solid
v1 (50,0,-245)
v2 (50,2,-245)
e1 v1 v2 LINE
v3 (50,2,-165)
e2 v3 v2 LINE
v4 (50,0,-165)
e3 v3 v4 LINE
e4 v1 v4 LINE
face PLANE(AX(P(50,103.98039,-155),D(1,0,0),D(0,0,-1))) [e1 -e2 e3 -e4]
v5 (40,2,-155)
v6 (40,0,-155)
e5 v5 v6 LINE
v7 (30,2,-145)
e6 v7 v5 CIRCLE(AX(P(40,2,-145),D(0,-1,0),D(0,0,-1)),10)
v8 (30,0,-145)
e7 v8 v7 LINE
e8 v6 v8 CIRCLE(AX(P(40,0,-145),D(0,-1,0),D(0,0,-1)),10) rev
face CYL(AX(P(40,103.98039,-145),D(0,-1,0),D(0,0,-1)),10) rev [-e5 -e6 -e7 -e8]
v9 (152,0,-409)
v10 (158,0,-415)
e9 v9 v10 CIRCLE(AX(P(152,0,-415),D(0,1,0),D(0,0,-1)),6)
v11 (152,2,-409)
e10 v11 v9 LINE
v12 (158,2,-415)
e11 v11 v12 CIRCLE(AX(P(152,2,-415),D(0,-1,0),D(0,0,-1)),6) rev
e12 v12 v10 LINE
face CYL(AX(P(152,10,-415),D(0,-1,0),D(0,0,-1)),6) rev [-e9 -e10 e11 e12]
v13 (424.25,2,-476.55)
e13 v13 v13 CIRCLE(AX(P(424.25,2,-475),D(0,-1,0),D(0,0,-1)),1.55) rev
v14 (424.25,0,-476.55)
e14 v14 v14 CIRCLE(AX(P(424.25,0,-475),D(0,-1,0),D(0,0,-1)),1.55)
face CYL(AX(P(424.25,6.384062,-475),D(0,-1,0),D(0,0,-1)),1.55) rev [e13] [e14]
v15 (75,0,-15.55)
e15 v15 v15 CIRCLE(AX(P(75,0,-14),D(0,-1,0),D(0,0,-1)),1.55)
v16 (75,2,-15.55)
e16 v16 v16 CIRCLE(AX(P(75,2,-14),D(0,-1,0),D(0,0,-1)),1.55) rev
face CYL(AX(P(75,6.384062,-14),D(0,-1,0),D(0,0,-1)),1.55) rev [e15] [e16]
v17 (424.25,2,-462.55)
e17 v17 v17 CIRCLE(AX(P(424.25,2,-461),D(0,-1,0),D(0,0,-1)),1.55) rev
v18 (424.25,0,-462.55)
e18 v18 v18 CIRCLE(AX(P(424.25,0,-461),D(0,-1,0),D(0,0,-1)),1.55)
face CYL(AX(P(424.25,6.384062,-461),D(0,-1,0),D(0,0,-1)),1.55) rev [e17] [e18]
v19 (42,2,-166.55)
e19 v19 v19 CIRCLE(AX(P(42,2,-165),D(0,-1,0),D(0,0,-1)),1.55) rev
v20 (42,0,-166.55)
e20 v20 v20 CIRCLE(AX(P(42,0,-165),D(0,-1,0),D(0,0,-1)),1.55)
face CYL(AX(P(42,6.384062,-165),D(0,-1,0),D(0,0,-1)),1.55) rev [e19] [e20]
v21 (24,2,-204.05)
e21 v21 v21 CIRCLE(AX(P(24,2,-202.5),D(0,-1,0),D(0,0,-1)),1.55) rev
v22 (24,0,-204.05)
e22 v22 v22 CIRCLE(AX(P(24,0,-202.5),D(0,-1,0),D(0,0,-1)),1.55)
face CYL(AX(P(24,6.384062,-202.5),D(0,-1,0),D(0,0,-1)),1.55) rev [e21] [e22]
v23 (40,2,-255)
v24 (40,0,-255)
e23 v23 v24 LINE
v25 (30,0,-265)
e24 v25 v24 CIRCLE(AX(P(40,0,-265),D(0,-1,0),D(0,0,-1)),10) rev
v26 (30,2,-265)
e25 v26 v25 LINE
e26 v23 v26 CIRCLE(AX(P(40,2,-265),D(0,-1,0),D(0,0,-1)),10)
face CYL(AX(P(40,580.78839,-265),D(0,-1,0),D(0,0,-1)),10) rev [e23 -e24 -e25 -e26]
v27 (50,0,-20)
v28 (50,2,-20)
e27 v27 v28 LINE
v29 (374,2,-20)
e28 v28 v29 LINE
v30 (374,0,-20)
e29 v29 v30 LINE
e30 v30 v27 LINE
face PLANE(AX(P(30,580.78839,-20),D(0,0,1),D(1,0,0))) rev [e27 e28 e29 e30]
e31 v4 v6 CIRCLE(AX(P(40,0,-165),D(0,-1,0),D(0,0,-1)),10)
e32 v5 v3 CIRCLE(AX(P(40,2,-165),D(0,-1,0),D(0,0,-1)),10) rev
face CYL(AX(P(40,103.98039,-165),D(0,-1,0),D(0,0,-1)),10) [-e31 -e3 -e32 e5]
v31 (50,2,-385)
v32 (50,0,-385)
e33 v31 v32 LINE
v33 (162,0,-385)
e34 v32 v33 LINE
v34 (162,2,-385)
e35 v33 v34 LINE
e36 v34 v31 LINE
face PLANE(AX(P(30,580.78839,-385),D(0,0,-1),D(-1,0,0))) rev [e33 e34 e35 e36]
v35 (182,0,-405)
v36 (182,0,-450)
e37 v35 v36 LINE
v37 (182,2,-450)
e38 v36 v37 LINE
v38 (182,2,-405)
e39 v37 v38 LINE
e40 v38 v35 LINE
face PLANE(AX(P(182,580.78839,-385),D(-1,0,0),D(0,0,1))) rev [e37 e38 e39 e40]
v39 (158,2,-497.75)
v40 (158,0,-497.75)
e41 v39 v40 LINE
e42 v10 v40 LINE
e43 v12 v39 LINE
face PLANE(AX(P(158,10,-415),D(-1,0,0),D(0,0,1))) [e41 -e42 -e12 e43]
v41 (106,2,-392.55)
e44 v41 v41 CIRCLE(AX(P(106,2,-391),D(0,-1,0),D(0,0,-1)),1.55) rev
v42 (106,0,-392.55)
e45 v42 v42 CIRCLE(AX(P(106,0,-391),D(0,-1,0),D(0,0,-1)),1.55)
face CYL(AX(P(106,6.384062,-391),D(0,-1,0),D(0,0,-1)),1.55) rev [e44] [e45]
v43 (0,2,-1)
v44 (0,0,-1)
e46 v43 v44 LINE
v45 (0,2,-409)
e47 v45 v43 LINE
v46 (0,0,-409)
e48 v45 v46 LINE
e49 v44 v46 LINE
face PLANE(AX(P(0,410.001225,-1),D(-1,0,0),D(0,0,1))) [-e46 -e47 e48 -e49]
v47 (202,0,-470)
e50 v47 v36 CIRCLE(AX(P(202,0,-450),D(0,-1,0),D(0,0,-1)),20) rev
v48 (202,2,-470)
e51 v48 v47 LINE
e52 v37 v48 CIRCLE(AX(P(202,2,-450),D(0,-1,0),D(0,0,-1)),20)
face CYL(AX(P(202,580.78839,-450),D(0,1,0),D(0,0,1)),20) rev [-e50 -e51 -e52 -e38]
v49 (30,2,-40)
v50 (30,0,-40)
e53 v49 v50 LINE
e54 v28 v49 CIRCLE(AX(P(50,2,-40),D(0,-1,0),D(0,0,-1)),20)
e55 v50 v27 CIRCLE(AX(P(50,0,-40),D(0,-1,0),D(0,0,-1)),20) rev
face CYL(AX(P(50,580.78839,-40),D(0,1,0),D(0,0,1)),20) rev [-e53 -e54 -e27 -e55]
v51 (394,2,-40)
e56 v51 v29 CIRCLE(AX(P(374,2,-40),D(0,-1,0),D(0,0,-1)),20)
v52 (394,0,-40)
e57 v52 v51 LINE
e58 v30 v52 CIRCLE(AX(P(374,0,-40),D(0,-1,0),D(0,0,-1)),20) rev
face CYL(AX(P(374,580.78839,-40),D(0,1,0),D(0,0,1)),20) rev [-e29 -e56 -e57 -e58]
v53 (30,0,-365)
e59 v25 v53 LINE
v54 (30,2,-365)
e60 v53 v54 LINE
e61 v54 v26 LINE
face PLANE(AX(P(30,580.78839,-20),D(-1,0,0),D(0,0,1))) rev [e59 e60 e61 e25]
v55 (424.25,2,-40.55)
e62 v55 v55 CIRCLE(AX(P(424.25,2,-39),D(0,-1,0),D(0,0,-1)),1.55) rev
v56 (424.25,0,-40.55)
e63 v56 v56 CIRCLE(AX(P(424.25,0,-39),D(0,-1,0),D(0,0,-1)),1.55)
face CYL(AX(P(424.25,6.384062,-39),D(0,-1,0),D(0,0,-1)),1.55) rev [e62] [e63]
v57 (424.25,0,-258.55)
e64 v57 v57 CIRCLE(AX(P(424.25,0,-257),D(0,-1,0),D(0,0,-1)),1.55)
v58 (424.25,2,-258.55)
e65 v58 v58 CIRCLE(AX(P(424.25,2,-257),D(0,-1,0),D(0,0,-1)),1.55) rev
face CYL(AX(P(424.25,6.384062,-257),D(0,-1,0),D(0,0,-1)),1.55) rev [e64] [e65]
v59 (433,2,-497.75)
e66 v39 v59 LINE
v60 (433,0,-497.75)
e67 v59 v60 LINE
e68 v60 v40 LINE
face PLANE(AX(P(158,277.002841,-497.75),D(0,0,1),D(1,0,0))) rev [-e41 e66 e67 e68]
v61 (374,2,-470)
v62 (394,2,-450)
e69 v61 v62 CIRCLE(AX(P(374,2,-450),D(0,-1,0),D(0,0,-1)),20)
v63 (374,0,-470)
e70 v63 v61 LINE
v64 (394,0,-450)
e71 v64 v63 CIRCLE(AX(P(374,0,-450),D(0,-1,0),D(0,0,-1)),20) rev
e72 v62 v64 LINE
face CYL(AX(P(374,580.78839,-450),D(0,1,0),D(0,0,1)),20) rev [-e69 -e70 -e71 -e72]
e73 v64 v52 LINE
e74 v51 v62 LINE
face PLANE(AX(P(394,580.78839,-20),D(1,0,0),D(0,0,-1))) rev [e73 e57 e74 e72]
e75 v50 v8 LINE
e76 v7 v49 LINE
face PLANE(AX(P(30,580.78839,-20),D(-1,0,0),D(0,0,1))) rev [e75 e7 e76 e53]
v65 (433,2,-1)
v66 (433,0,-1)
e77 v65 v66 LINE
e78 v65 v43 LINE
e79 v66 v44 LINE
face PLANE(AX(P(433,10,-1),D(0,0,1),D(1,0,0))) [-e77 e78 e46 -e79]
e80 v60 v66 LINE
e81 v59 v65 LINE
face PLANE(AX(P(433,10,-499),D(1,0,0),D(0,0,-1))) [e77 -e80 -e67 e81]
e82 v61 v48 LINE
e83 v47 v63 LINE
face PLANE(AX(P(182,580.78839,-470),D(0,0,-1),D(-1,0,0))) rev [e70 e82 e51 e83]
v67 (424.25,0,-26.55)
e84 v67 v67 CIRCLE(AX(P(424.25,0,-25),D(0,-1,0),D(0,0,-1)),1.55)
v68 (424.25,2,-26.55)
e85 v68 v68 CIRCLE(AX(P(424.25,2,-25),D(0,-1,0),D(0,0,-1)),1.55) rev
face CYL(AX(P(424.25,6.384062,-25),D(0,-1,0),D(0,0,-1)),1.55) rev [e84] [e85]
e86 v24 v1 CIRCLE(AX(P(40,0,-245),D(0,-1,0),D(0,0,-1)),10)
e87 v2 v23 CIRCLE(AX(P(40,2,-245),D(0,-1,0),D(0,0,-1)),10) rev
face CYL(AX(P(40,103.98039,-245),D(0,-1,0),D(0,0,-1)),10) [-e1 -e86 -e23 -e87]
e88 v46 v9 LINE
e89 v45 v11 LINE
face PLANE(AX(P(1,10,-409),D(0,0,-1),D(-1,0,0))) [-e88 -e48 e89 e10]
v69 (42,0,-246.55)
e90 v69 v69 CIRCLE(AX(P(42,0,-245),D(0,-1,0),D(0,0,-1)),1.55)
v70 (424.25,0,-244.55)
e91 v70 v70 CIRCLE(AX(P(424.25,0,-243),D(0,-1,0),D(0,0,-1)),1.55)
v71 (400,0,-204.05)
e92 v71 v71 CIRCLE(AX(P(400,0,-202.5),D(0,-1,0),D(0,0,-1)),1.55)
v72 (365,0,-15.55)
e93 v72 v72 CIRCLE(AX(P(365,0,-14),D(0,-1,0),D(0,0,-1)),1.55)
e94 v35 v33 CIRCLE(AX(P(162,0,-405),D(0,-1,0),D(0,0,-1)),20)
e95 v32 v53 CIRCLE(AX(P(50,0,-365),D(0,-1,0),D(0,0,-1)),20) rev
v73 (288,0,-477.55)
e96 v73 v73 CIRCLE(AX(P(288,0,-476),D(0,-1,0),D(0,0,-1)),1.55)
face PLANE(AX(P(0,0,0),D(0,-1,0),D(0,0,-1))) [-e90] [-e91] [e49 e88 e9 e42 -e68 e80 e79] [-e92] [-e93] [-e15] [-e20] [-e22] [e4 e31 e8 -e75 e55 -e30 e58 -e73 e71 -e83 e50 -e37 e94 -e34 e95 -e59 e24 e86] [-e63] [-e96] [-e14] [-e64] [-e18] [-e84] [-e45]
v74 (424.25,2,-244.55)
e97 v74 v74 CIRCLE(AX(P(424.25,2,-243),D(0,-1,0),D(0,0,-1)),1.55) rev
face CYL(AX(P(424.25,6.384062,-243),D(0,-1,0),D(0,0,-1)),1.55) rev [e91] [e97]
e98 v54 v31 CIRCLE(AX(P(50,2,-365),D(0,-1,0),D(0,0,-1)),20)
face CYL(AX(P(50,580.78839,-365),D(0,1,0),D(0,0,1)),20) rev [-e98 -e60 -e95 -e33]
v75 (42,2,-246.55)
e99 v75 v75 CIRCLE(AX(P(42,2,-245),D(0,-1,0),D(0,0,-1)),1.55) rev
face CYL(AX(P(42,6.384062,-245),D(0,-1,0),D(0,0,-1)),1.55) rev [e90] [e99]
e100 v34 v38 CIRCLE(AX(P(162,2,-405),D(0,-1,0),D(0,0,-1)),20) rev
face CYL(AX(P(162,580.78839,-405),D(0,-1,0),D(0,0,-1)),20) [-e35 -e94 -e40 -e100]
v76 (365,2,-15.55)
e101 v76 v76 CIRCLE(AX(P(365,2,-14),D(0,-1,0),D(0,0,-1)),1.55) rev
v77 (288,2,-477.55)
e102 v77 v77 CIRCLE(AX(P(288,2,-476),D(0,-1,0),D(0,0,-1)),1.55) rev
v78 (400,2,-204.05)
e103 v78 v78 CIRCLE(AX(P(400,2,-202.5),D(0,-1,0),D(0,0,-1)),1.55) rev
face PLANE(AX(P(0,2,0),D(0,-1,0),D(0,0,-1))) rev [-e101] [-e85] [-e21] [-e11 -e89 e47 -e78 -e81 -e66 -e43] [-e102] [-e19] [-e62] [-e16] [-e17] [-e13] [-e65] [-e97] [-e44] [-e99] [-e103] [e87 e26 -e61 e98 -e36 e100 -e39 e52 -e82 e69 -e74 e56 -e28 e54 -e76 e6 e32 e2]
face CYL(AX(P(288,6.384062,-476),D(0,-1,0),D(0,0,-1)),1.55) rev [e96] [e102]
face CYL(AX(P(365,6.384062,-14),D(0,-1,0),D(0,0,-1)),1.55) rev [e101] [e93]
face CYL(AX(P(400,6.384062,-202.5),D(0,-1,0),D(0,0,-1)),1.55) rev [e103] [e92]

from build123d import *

# Parameters (mm, degrees)
CROQUIS1_W              = 434
CROQUIS1_H              = 500
SALIENTE_EXTRUIR1_DEPTH = 2
CROQUIS3_W              = 157
CROQUIS3_H              = 90
CORTAR_EXTRUIR2_DEPTH   = 2
REDONDEO1_R             = 5
CORTAR_EXTRUIR3_DEPTH   = 2
REDONDEO2_R             = 20
CROQUIS6_R              = 1.55
CORTAR_EXTRUIR5_DEPTH   = 2
CROQUIS7_R              = 1.55
CORTAR_EXTRUIR6_DEPTH   = 2
CROQUIS8_W              = 20
CROQUIS8_H              = 100
SALIENTE_EXTRUIR2_DEPTH = 2
REDONDEO3_R             = 10
CROQUIS9_R              = 1.55
CORTAR_EXTRUIR7_DEPTH   = 2
CROQUIS10_OUTSIDE_W     = 568.418
CROQUIS10_OUTSIDE_H     = 634.418
CORTAR_EXTRUIR8_DEPTH   = 10
CROQUIS11_W             = 275
CROQUIS11_H             = 1.25
CORTAR_EXTRUIR9_DEPTH   = 2
CROQUIS12_W             = 1
CROQUIS12_H             = 408
SALIENTE_EXTRUIR3_DEPTH = 2


with BuildPart() as part:
    # Croquis1 → Saliente-Extruir1 (new body)
    with BuildSketch(Plane(origin=(0, 0, 0), x_dir=(1, 0, 0), z_dir=(0, 1, 0))):
        with Locations((217, 250)):
            Rectangle(CROQUIS1_W, CROQUIS1_H)
    extrude(amount=SALIENTE_EXTRUIR1_DEPTH)

    # Croquis3 → Cortar-Extruir2 (cut)
    with BuildSketch(Plane.XZ):
        with Locations((78.5, -455)):
            Rectangle(CROQUIS3_W, CROQUIS3_H)
    extrude(amount=-CORTAR_EXTRUIR2_DEPTH, mode=Mode.SUBTRACT)

    # Redondeo1
    redondeo1_edges = [part.edges().sort_by_distance(p)[0] for p in [
        (157, 1, -410),
    ]]
    fillet(redondeo1_edges, radius=REDONDEO1_R)

    # Croquis4 → Cortar-Extruir3 (cut)
    with BuildSketch(Plane.XZ):
        Polygon((30, -20), (394, -20), (394, -233.661541009), (394, -470), (182, -470), (182, -385), (30, -385), align=None)
    extrude(amount=-CORTAR_EXTRUIR3_DEPTH, mode=Mode.SUBTRACT)

    # Redondeo2
    redondeo2_edges = [part.edges().sort_by_distance(p)[0] for p in [
        (30, 1, -385),
        (30, 1, -20),
        (394, 1, -20),
        (394, 1, -470),
        (182, 1, -470),
        (182, 1, -385),
    ]]
    fillet(redondeo2_edges, radius=REDONDEO2_R)

    # Croquis6 → Cortar-Extruir5 (cut)
    with BuildSketch(Plane.XZ):
        with Locations(Location((75, -14, 0), (0, 0, 270))):
            Circle(CROQUIS6_R)
        with Locations(Location((365, -14, 0), (0, 0, 270))):
            Circle(CROQUIS6_R)
        with Locations(Location((288, -476, 0), (0, 0, 270))):
            Circle(CROQUIS6_R)
        with Locations(Location((106, -391, 0), (0, 0, 270))):
            Circle(CROQUIS6_R)
        with Locations(Location((24, -202.5, 0), (0, 0, 270))):
            Circle(CROQUIS6_R)
        with Locations(Location((400, -202.5, 0), (0, 0, 270))):
            Circle(CROQUIS6_R)
    extrude(amount=-CORTAR_EXTRUIR5_DEPTH, mode=Mode.SUBTRACT)

    # Croquis7 → Cortar-Extruir6 (cut)
    with BuildSketch(Plane.XZ):
        with Locations(Location((424.25, -25, 0), (0, 0, 270))):
            Circle(CROQUIS7_R)
        with Locations(Location((424.25, -39, 0), (0, 0, 270))):
            Circle(CROQUIS7_R)
        with Locations(Location((424.25, -475, 0), (0, 0, 270))):
            Circle(CROQUIS7_R)
        with Locations(Location((424.25, -461, 0), (0, 0, 270))):
            Circle(CROQUIS7_R)
        with Locations(Location((424.25, -243, 0), (0, 0, 270))):
            Circle(CROQUIS7_R)
        with Locations(Location((424.25, -257, 0), (0, 0, 270))):
            Circle(CROQUIS7_R)
    extrude(amount=-CORTAR_EXTRUIR6_DEPTH, mode=Mode.SUBTRACT)

    # Croquis8 → Saliente-Extruir2 (add)
    with BuildSketch(Plane.XZ):
        with Locations((40, -205)):
            Rectangle(CROQUIS8_W, CROQUIS8_H)
    extrude(amount=-SALIENTE_EXTRUIR2_DEPTH)

    # Redondeo3
    redondeo3_edges = [part.edges().sort_by_distance(p)[0] for p in [
        (30, 1, -255),
        (30, 1, -155),
    ]]
    fillet(redondeo3_edges, radius=REDONDEO3_R)
    redondeo3_2_edges = [part.edges().sort_by_distance(p)[0] for p in [
        (50, 1, -255),
        (50, 1, -155),
    ]]
    fillet(redondeo3_2_edges, radius=REDONDEO3_R - 0.0001)  # a hair under: the kernel refuses the full size

    # Croquis9 → Cortar-Extruir7 (cut)
    with BuildSketch(Plane.XZ):
        with Locations(Location((42, -165, 0), (0, 0, 270))):
            Circle(CROQUIS9_R)
        with Locations(Location((42, -245, 0), (0, 0, 270))):
            Circle(CROQUIS9_R)
    extrude(amount=-CORTAR_EXTRUIR7_DEPTH, mode=Mode.SUBTRACT)

    # Croquis10 outside → Cortar-Extruir8 (cut)
    with BuildSketch(Plane.XZ):
        with Locations((217, -250)):
            Rectangle(CROQUIS10_OUTSIDE_W, CROQUIS10_OUTSIDE_H)
        with BuildLine():
            Line((1, -409), (152, -409))
            ThreePointArc((152, -409), (156.242640687, -410.757359313), (158, -415))
            Line((158, -415), (158, -499))
            Line((158, -499), (433, -499))
            Line((433, -499), (433, -1))
            Line((433, -1), (1, -1))
            Line((1, -1), (1, -409))
        make_face(mode=Mode.SUBTRACT)
    extrude(amount=-CORTAR_EXTRUIR8_DEPTH, mode=Mode.SUBTRACT)

    # Croquis11 → Cortar-Extruir9 (cut)
    with BuildSketch(Plane.XZ):
        with Locations((295.5, -498.375)):
            Rectangle(CROQUIS11_W, CROQUIS11_H)
    extrude(amount=-CORTAR_EXTRUIR9_DEPTH, mode=Mode.SUBTRACT)

    # Croquis12 → Saliente-Extruir3 (add)
    with BuildSketch(Plane.XZ):
        with Locations((0.5, -205)):
            Rectangle(CROQUIS12_W, CROQUIS12_H)
    extrude(amount=-SALIENTE_EXTRUIR3_DEPTH)


solid = part.part
